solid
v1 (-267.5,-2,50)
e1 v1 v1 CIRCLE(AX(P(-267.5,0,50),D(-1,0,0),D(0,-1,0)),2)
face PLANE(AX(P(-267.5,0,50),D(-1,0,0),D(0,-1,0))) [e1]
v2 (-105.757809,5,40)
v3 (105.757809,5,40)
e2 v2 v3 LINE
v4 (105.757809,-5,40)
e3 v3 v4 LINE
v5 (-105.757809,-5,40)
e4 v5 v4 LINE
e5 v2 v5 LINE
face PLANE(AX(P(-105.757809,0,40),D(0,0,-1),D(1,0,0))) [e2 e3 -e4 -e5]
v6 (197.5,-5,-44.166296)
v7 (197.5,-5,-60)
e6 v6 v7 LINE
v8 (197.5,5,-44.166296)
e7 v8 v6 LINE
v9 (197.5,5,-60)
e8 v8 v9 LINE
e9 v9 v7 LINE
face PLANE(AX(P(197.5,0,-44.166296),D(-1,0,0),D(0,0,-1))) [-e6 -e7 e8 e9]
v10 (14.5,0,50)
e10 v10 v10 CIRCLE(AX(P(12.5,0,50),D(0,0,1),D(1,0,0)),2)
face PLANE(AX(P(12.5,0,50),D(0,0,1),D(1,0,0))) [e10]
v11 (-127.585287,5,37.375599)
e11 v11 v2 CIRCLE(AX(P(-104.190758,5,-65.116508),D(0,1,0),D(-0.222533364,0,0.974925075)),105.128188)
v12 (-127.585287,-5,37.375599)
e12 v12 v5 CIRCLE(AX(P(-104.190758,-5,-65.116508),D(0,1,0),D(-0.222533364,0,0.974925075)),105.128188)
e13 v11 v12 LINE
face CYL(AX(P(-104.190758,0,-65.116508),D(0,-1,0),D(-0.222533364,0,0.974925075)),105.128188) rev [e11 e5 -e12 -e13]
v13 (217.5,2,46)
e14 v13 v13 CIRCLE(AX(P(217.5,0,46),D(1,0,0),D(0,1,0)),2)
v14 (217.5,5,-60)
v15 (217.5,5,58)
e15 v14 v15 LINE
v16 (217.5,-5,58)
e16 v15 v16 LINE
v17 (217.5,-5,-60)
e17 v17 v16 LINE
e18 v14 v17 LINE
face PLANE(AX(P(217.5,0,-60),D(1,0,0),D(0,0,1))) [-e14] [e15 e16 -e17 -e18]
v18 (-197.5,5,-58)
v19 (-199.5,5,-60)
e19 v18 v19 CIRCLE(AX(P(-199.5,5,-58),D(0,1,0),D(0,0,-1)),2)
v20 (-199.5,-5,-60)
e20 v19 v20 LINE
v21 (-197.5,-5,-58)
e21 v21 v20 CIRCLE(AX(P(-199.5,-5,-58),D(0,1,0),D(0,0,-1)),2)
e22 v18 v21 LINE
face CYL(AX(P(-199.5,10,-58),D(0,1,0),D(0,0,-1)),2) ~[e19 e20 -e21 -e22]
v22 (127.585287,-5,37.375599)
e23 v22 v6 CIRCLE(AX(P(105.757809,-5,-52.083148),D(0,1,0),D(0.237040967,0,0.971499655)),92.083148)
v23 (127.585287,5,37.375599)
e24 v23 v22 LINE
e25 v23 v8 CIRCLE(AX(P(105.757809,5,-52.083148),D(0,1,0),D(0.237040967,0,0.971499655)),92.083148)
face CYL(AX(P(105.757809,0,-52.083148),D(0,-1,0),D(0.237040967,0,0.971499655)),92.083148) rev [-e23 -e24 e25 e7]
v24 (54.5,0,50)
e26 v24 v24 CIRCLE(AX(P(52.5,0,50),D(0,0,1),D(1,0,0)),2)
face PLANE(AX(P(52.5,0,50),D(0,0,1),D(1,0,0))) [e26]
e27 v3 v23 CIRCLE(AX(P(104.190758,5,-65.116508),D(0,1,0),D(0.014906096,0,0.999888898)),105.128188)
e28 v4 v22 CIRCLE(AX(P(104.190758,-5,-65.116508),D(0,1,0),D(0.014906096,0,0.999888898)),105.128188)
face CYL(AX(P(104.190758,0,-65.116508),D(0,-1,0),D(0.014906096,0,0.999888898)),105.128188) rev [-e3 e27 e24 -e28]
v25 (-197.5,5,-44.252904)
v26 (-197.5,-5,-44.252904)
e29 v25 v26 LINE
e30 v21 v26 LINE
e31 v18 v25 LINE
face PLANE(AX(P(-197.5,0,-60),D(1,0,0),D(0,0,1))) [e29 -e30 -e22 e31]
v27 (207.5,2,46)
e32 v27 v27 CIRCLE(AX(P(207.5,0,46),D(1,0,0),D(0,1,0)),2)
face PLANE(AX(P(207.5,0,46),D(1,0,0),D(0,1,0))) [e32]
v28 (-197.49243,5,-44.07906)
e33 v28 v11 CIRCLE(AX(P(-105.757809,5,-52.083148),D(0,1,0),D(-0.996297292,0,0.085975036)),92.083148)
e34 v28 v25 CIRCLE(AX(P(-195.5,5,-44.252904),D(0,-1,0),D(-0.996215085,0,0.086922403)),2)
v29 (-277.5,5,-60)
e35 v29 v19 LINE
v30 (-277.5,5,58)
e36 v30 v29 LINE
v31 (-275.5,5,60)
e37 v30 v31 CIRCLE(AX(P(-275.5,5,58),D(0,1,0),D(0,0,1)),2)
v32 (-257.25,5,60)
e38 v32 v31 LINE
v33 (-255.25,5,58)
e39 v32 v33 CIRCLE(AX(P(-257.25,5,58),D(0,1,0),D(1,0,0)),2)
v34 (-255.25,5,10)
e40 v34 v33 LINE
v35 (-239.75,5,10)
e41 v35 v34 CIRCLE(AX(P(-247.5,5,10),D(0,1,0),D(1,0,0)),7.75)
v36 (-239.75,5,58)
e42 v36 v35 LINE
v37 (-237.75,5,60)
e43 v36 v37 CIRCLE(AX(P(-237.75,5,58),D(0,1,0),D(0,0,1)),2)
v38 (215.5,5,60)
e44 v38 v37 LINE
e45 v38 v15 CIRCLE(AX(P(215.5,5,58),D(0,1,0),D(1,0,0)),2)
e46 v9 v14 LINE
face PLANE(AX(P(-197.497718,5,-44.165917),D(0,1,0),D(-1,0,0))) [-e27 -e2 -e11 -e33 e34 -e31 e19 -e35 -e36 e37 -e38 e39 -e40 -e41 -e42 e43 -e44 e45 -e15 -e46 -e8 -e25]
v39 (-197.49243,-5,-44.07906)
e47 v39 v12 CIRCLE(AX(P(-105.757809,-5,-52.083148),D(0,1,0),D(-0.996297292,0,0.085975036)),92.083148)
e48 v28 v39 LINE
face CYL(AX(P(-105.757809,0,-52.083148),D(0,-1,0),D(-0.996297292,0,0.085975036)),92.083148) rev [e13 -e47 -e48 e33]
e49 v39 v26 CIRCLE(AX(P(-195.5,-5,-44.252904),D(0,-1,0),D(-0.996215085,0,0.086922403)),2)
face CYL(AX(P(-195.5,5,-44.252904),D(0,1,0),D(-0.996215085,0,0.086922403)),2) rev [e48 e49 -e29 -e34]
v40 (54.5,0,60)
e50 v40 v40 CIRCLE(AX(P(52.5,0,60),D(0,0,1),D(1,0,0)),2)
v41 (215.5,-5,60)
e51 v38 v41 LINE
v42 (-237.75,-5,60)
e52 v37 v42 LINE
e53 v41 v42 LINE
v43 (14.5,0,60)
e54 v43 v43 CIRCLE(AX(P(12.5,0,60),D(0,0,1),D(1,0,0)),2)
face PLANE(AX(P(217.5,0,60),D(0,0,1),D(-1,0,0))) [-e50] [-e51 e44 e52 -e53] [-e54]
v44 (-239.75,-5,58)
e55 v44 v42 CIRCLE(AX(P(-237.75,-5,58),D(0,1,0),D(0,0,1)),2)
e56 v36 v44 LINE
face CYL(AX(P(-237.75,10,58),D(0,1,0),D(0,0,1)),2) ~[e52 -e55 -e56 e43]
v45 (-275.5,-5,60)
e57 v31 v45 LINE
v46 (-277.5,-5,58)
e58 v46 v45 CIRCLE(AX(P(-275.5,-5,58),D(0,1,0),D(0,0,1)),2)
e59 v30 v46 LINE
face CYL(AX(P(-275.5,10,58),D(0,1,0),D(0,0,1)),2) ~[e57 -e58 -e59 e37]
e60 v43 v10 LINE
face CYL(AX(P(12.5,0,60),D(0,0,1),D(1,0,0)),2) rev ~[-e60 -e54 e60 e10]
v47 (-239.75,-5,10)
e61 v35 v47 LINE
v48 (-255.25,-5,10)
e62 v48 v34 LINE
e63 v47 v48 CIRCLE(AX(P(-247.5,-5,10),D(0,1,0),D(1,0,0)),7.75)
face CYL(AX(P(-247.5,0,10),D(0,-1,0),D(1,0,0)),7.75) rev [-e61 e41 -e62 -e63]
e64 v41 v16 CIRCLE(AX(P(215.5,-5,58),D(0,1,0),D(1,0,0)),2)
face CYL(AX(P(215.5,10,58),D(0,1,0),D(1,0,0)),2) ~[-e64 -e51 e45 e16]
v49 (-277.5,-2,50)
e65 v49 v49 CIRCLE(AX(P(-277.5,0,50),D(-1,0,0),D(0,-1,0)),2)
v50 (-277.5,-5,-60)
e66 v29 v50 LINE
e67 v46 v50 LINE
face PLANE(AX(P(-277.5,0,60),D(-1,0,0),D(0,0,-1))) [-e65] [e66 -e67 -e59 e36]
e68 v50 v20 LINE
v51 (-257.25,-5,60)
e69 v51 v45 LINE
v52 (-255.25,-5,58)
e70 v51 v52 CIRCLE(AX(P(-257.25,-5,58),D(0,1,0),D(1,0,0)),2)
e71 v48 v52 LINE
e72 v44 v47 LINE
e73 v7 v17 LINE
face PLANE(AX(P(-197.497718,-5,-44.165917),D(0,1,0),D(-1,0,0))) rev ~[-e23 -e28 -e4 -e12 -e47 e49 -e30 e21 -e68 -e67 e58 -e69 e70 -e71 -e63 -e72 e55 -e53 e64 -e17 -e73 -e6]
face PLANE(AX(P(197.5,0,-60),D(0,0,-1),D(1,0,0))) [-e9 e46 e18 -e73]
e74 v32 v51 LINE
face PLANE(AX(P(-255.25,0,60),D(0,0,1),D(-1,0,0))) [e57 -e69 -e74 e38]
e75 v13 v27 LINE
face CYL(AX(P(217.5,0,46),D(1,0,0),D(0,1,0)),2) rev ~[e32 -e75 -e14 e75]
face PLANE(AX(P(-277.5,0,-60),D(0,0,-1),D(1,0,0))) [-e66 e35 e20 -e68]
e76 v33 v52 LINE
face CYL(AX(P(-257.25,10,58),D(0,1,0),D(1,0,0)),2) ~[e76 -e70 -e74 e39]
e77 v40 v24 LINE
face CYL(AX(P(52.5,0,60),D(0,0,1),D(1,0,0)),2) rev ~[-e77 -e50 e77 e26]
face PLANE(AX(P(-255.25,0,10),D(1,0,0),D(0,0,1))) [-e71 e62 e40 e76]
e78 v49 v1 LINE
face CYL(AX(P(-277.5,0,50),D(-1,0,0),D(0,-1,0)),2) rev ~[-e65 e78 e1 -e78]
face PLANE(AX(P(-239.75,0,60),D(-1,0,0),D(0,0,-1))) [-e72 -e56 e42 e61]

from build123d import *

# Parameters (mm, degrees)
F1_DEPTH    = 5
F2_T1_DEPTH = 10
F2_T3_DEPTH = 20
F4_R        = 2
F5_DEPTH    = 10
F6_R        = 2
F7_DEPTH    = 10
F8_R        = 2
F9_DEPTH    = 10


# Not quite as in the source:
# - a fillet or chamfer that OpenCascade refuses, or shapes differently, is made with other operations: its cross-section is extruded or revolved along the edge and cut away or added
# - two fillets or chamfers of one size are made in one step


with BuildPart() as f1:
    # F0 (on Front) → F1 (new body, symmetric)
    with BuildSketch(Plane.XZ):
        with BuildLine():
            Line((-277.5, 60), (-277.5, -60))
            Line((-277.5, -60), (-197.5, -60))
            Line((-197.5, -60), (-197.5, -44.1662961254))
            ThreePointArc((-197.5, -44.1662961254), (-175.6633710032, 7.8544741443), (-127.5852874265, 37.3755985301))
            ThreePointArc((-127.5852874265, 37.3755985301), (-116.7403394644, 39.2599448569), (-105.7578089833, 40))
            Line((-105.7578089833, 40), (105.7578089833, 40))
            ThreePointArc((105.7578089833, 40), (116.7403394644, 39.2599448569), (127.5852874265, 37.3755985301))
            ThreePointArc((127.5852874265, 37.3755985301), (175.6633710032, 7.8544741443), (197.5, -44.1662961254))
            Line((197.5, -44.1662961254), (197.5, -60))
            Line((197.5, -60), (217.5, -60))
            Line((217.5, -60), (217.5, 40))
            Line((217.5, 40), (217.5, 60))
            Line((217.5, 60), (-239.75, 60))
            Line((-239.75, 60), (-239.75, 10))
            ThreePointArc((-239.75, 10), (-247.5, 2.25), (-255.25, 10))
            Line((-255.25, 10), (-255.25, 60))
            Line((-255.25, 60), (-277.5, 60))
        make_face()
    extrude(amount=F1_DEPTH, both=True)

    # F2: fillet of radius 2 on 6 edges, made by hand

    # F2_s2 → F2_t1 (join)
    with BuildSketch(Plane.XZ.offset(-5)):
        with BuildLine():
            ThreePointArc((-197.4924301703, -44.0790595559), (-197.4981066464, -44.1658995935), (-197.5, -44.252904362))
            Line((-197.5, -44.252904362), (-197.5, -44.1662961254))
            ThreePointArc((-197.5, -44.1662961254), (-197.4962254546, -44.1226769409), (-197.4924301703, -44.0790595559))
        make_face()
    extrude(amount=F2_T1_DEPTH)

    # F2_s4 → F2_t3 (cut)
    with BuildSketch(Plane.XZ.offset(-10)):
        with BuildLine():
            ThreePointArc((-255.25, 58), (-255.8357864376, 59.4142135624), (-257.25, 60))
            Line((-257.25, 60), (-255.25, 60))
            Line((-255.25, 60), (-255.25, 58))
        make_face()
        with BuildLine():
            ThreePointArc((-275.5, 60), (-276.9142135624, 59.4142135624), (-277.5, 58))
            Line((-277.5, 58), (-277.5, 60))
            Line((-277.5, 60), (-275.5, 60))
        make_face()
        with BuildLine():
            ThreePointArc((-199.5, -60), (-198.0857864376, -59.4142135624), (-197.5, -58))
            Line((-197.5, -58), (-197.5, -60))
            Line((-197.5, -60), (-199.5, -60))
        make_face()
        with BuildLine():
            ThreePointArc((-237.75, 60), (-239.1642135624, 59.4142135624), (-239.75, 58))
            Line((-239.75, 58), (-239.75, 60))
            Line((-239.75, 60), (-237.75, 60))
        make_face()
        with BuildLine():
            ThreePointArc((217.5, 58), (216.9142135624, 59.4142135624), (215.5, 60))
            Line((215.5, 60), (217.5, 60))
            Line((217.5, 60), (217.5, 58))
        make_face()
    extrude(amount=F2_T3_DEPTH, mode=Mode.SUBTRACT)

    # F4 (on face) → F5 (cut)
    with BuildSketch(Plane.XY.offset(60)):
        with Locations((12.5, 0)):
            Circle(F4_R)
        with Locations((52.5, 0)):
            Circle(F4_R)
    extrude(amount=-F5_DEPTH, mode=Mode.SUBTRACT)

    # F6 (on face) → F7 (cut)
    with BuildSketch(Plane.YZ.offset(217.5)):
        with Locations((0, 46)):
            Circle(F6_R)
    extrude(amount=-F7_DEPTH, mode=Mode.SUBTRACT)

    # F8 (on face) → F9 (cut)
    with BuildSketch(Plane(origin=(-277.5, 0, 0), x_dir=(0, -1, 0), z_dir=(-1, 0, 0))):
        with Locations((0, 50)):
            Circle(F8_R)
    extrude(amount=-F9_DEPTH, mode=Mode.SUBTRACT)


solid = f1.part
